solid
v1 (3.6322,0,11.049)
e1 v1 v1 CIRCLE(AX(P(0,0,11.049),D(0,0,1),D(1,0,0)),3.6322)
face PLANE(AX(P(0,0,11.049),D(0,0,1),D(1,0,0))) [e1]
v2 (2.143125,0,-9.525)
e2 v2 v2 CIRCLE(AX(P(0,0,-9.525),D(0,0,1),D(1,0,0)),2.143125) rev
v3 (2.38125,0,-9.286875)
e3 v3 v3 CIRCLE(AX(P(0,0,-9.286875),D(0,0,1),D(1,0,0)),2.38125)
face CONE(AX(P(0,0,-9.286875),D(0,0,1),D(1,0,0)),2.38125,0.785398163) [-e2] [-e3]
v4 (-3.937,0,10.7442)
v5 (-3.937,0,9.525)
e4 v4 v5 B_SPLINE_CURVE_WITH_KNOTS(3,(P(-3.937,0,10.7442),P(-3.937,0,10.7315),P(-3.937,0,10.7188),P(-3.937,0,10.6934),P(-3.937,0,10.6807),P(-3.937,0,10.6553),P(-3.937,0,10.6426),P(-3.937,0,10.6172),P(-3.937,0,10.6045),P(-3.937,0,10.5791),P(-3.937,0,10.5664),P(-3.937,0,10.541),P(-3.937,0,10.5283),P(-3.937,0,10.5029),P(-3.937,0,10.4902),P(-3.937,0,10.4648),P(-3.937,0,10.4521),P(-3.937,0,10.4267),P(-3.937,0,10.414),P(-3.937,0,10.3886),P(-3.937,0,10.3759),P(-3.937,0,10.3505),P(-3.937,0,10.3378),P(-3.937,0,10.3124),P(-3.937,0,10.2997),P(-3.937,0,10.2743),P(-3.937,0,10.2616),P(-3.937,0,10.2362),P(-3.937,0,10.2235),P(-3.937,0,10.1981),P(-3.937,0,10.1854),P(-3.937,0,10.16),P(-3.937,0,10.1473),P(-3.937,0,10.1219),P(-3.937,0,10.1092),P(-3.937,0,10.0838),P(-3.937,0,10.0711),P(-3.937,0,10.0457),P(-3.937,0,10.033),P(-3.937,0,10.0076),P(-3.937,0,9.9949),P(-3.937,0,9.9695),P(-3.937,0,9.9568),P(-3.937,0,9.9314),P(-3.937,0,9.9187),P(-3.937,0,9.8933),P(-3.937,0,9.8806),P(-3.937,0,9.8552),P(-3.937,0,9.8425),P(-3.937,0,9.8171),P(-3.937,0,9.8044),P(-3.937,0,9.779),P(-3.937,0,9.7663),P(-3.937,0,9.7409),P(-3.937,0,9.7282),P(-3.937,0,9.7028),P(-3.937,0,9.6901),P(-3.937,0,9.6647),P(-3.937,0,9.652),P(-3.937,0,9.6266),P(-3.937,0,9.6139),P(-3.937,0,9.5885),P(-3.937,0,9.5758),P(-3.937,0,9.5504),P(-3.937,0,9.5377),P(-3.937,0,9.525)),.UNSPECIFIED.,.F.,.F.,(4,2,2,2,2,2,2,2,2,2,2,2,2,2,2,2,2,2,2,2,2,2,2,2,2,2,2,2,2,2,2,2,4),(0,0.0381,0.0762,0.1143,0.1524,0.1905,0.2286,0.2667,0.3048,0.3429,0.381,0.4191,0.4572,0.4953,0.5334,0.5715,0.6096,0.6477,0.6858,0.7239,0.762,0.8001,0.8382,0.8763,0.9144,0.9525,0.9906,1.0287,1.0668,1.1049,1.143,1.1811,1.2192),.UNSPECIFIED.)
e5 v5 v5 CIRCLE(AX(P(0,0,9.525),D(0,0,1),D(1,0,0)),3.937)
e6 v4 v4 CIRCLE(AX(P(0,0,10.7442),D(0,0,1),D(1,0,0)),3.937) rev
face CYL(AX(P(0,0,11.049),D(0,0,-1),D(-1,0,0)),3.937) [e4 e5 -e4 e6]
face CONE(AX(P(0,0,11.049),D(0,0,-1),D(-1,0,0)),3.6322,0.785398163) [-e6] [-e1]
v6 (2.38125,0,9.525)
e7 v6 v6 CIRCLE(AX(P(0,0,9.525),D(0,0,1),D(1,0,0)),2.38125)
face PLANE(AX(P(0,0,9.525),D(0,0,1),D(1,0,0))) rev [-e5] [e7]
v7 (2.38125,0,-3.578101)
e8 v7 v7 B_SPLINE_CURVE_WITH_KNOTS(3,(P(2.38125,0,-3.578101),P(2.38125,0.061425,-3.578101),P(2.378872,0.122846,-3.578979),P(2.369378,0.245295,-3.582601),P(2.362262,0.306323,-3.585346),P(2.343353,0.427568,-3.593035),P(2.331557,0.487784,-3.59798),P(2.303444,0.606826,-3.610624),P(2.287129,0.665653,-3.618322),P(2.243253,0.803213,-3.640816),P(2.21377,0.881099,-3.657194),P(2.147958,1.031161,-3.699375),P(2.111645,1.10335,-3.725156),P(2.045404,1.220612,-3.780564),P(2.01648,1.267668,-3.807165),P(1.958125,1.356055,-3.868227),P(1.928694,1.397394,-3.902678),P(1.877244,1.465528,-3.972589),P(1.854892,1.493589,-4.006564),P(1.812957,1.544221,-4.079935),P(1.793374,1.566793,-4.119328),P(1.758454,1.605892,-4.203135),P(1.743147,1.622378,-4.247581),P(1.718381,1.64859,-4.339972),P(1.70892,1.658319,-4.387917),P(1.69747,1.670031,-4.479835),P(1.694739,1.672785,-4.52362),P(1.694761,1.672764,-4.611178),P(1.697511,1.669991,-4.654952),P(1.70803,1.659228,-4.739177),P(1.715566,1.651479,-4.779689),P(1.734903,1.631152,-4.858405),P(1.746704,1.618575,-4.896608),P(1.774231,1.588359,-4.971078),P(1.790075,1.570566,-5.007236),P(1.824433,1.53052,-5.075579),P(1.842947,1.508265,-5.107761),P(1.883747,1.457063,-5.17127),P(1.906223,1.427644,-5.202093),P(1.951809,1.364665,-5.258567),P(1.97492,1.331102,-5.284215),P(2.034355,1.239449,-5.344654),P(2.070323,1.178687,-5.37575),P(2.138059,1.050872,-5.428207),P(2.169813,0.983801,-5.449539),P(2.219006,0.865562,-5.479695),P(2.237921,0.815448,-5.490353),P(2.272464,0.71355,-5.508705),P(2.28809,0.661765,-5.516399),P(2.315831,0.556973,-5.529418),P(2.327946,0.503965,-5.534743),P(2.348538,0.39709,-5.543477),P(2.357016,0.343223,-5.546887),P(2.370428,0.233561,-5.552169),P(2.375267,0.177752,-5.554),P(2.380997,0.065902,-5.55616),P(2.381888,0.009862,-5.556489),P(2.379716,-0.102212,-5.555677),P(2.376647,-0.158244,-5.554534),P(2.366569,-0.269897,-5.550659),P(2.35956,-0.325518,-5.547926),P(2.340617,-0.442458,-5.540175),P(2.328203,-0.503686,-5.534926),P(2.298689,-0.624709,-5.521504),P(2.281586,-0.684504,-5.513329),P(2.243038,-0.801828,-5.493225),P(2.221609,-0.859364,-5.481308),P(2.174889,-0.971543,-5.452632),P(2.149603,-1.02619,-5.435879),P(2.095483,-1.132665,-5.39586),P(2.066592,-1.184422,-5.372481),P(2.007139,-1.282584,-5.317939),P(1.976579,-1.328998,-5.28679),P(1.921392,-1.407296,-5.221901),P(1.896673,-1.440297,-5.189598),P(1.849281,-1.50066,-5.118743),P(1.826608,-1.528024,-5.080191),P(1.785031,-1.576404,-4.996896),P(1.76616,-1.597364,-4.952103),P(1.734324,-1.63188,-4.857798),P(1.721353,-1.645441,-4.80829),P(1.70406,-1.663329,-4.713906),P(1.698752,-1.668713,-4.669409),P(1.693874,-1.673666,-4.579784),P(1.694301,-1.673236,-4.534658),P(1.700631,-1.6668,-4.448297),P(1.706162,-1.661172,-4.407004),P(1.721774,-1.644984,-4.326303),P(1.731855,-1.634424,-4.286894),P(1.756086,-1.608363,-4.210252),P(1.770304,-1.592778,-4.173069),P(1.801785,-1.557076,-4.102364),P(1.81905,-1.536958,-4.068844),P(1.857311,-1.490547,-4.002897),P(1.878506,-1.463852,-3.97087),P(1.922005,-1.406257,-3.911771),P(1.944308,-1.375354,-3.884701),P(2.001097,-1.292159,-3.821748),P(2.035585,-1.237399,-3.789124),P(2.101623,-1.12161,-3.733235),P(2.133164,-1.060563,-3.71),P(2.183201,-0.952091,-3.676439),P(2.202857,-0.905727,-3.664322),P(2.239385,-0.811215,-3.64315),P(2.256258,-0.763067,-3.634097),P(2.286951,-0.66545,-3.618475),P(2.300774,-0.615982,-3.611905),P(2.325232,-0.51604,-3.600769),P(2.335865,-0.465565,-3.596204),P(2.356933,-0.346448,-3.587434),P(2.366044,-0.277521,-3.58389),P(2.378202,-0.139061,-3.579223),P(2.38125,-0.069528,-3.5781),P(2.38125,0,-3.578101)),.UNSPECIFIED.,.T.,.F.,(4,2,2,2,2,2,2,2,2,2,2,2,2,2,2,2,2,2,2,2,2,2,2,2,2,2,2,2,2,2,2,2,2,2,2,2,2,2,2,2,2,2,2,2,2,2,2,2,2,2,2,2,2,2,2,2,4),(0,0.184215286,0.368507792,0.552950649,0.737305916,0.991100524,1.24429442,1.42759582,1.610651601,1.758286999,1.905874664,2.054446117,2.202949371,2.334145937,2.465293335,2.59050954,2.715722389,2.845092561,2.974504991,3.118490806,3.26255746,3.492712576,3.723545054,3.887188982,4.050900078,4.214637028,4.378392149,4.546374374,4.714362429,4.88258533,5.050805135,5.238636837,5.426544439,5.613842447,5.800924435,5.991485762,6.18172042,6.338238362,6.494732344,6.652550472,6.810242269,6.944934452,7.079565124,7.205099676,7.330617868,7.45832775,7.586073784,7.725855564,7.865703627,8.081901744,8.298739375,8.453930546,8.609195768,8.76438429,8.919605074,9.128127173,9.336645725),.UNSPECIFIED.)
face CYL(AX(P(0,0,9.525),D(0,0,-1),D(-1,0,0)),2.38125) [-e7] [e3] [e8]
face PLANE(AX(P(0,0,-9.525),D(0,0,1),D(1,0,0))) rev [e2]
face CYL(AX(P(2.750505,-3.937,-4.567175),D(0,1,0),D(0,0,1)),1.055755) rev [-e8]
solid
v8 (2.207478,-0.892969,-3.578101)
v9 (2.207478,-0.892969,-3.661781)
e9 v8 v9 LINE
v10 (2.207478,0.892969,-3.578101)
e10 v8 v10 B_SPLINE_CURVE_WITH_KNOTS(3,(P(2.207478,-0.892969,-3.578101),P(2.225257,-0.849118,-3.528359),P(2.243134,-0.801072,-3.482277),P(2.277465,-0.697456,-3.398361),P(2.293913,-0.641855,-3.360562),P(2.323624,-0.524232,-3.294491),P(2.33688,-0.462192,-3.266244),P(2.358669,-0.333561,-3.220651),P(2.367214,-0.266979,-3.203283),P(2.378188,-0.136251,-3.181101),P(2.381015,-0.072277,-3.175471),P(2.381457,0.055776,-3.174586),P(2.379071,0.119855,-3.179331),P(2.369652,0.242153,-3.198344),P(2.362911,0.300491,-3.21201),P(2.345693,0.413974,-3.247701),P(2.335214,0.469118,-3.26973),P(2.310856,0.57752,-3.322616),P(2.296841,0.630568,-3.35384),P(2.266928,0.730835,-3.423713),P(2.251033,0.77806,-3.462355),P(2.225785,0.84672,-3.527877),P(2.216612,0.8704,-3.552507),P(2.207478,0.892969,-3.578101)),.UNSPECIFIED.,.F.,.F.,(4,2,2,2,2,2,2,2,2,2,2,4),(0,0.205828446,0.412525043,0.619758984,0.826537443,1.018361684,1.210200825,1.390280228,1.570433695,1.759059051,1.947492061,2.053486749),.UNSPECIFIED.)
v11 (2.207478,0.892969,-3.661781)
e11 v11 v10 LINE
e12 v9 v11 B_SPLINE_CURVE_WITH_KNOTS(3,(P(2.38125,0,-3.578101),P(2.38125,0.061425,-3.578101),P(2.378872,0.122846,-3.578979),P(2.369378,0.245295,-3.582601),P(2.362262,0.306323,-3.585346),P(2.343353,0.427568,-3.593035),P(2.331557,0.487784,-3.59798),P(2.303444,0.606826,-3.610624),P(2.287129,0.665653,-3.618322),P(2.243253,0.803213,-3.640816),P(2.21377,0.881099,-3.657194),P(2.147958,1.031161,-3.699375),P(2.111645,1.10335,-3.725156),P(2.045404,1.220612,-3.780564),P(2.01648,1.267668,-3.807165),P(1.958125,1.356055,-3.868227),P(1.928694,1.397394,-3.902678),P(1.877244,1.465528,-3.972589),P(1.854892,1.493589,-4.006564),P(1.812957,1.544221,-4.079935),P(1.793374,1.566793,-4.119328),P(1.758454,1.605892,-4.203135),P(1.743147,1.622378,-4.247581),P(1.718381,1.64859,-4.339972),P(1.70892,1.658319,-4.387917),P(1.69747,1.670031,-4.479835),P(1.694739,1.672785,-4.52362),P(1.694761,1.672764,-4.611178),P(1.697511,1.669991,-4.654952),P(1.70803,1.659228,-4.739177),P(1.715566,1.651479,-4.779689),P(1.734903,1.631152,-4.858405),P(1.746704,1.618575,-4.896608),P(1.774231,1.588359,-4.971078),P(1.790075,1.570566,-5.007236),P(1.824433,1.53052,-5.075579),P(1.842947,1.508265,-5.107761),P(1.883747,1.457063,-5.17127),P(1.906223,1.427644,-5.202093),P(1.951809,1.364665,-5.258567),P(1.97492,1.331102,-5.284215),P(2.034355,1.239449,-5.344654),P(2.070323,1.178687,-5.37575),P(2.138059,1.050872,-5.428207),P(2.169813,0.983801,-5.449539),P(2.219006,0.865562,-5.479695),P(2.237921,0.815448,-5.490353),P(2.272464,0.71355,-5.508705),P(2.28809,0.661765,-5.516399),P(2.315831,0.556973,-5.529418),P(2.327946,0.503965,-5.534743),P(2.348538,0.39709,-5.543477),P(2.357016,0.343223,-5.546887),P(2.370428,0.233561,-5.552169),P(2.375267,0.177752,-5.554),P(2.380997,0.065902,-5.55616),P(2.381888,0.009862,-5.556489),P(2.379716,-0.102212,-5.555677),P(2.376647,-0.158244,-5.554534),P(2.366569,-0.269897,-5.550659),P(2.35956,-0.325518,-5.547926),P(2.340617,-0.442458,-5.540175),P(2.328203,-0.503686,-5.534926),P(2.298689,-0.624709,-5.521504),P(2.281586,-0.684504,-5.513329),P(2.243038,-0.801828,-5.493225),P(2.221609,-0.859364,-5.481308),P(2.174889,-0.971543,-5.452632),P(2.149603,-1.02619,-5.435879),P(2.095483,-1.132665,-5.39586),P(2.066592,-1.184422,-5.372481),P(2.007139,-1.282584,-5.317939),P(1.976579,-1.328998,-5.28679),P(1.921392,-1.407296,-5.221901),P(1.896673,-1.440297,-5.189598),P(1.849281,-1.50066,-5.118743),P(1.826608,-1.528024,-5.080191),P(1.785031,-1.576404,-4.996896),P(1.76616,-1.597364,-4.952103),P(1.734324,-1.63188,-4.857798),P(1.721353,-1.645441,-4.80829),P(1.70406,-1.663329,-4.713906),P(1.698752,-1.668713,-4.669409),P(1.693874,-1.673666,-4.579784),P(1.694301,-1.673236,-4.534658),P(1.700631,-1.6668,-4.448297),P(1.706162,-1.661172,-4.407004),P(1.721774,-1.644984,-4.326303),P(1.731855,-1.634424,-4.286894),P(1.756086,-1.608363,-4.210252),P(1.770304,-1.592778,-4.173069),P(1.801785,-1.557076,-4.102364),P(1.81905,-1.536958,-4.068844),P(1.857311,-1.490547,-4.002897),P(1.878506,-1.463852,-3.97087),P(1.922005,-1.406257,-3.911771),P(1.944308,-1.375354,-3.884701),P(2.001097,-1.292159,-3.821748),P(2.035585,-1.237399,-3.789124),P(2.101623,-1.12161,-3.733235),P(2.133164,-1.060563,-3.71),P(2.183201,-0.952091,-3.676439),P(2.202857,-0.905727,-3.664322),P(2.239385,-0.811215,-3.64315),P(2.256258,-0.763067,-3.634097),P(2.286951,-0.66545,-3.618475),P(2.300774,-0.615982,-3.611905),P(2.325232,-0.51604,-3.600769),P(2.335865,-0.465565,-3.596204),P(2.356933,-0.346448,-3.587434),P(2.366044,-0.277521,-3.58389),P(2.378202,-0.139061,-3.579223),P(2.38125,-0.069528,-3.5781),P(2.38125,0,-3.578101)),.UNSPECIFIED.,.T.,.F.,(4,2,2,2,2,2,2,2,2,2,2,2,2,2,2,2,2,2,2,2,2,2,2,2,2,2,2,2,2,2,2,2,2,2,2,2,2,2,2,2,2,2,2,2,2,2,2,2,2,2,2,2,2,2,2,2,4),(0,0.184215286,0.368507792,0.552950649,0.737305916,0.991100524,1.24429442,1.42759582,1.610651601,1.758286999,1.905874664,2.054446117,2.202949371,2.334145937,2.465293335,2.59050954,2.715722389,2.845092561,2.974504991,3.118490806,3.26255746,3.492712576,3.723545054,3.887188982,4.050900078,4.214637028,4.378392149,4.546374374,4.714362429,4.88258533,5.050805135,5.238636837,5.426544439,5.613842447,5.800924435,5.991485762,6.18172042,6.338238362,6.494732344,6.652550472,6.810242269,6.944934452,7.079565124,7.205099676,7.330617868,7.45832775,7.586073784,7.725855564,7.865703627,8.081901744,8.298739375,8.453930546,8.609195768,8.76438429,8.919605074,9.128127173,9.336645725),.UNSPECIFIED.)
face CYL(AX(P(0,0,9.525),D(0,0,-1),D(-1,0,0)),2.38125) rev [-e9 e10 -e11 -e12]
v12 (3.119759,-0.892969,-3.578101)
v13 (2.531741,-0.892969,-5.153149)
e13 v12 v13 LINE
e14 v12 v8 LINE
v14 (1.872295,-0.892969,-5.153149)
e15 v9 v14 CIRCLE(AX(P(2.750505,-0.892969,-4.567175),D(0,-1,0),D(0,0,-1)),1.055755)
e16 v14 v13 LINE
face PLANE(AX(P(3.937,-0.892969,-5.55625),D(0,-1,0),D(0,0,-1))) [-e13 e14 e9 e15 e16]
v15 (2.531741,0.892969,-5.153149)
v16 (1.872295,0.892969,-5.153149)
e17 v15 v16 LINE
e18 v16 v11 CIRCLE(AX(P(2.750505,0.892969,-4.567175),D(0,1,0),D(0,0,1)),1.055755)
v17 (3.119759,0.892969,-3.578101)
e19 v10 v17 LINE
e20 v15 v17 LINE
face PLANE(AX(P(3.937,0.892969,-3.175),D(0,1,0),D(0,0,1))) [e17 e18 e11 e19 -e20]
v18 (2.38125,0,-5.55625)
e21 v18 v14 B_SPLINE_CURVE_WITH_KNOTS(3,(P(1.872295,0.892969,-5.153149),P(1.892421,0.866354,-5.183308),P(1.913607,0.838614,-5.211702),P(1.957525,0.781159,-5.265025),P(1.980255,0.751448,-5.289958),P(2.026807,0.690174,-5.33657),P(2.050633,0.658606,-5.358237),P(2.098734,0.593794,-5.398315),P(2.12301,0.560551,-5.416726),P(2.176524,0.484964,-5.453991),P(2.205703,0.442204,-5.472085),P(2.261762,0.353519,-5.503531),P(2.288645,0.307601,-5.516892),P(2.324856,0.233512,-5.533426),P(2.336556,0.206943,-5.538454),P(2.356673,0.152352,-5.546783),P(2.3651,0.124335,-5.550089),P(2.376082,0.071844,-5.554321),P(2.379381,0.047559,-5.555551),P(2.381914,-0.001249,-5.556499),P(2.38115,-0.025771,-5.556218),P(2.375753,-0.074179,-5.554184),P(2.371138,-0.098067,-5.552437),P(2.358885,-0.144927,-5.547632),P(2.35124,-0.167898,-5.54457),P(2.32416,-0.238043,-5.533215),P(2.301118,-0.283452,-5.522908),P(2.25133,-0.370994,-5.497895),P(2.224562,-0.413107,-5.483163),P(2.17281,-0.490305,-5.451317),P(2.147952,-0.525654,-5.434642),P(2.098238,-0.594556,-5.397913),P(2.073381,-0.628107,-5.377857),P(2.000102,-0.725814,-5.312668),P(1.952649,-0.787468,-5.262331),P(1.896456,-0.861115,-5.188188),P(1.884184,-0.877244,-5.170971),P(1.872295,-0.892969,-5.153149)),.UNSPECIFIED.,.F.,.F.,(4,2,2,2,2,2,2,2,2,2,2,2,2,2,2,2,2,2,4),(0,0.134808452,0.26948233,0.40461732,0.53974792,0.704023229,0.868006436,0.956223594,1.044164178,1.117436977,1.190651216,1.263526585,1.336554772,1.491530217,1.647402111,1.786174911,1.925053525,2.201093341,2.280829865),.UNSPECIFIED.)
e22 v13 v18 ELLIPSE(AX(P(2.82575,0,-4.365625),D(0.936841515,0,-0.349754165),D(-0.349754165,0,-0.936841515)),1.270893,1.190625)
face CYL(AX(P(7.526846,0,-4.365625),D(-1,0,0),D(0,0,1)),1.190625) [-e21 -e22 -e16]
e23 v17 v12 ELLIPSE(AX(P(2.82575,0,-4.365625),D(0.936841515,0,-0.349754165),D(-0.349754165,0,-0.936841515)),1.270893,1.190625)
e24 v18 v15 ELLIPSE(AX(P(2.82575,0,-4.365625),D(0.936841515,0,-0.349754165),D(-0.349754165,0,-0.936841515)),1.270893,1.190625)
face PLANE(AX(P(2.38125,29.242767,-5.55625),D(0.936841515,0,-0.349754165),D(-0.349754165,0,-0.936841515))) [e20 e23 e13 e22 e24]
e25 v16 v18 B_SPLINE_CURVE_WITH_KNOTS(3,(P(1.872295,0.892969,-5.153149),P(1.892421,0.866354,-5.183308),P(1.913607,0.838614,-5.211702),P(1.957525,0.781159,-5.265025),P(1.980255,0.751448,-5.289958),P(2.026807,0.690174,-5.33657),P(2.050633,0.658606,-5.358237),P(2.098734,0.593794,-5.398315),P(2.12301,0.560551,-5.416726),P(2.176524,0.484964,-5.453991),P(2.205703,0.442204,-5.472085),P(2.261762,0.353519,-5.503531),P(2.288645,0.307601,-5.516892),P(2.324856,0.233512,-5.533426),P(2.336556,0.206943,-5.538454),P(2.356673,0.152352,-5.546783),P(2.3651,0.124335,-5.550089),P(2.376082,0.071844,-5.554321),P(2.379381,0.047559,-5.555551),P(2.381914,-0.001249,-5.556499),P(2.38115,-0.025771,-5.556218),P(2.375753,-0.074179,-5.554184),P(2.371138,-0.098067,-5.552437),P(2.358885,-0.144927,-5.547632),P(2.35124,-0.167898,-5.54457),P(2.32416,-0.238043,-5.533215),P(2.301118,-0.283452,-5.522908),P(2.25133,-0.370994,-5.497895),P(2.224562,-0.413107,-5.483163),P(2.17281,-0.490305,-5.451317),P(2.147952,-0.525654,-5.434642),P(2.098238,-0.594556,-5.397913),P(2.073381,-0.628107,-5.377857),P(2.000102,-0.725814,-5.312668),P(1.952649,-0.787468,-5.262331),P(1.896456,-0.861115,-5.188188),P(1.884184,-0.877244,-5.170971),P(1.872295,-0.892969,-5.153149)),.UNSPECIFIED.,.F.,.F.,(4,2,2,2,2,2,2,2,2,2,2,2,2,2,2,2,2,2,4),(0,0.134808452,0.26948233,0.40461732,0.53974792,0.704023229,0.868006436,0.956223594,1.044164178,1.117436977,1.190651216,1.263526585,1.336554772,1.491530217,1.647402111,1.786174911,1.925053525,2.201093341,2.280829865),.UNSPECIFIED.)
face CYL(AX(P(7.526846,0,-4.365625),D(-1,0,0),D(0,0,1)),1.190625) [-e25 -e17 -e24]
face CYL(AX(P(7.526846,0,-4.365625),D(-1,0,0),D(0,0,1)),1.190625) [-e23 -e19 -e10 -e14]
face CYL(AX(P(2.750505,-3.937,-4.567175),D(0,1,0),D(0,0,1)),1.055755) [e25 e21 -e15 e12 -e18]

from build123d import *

# Parameters (mm, degrees)
SKETCH1_R               = 2.38125
EXTRUDE1_DEPTH          = 9.525
SKETCH2_R               = 3.937
EXTRUDE2_DEPTH          = 1.524
CHAMFER1_SIZE           = 0.3048
CHAMFER2_SIZE           = 0.238125
SKETCH3_R               = 1.190625
EXTRUDE5_DEPTH          = 3.27025
EXTRUDE6_DEPTH          = 13.372563962
EXTRUDE6_DEPTH_BACK     = 13.372563962
SKETCH11_W              = 2.38125
SKETCH11_H              = 1.48828125
EXTRUDE8_DEPTH          = 13.372563962
EXTRUDE7_DEPTH          = 13.372563962
EXTRUDE7_DEPTH_BACK     = 13.372563962
BODY_MOVE_COPY1_START   = -3
BODY_MOVE_COPY1_2_DEPTH = 6


with BuildPart() as part:
    # Sketch1 → Extrude1 (new, symmetric)
    with BuildSketch(Plane.XY):
        with Locations(Location((0, 0, 0), (0, 0, 180))):
            Circle(SKETCH1_R)
    extrude(amount=EXTRUDE1_DEPTH, both=True)

    # Sketch2 → Extrude2 (add)
    with BuildSketch(Plane.XY.offset(9.525)):
        with Locations(Location((0, 0, 0), (0, 0, 180))):
            Circle(SKETCH2_R)
    extrude(amount=EXTRUDE2_DEPTH)

    # Chamfer1
    chamfer1_edges = [part.edges().sort_by_distance(p)[0] for p in [
        (3.937, 0, 11.049),
    ]]
    chamfer(chamfer1_edges, length=CHAMFER1_SIZE)

    # Chamfer2
    chamfer2_edges = [part.edges().sort_by_distance(p)[0] for p in [
        (2.38125, 0, -9.525),
    ]]
    chamfer(chamfer2_edges, length=CHAMFER2_SIZE)

    # Sketch10 → Extrude7 (cut, two sides: drawn at the far end of the back side and taken through both)
    with BuildSketch(Plane(origin=(0, 0, 0), x_dir=(1, 0, 0), z_dir=(0, 1, 0)).offset(-EXTRUDE7_DEPTH_BACK)):
        with BuildLine():
            Line((2.38125, 5.55625), (2.38125, 3.578100586))
            ThreePointArc((2.38125, 3.578100586), (1.694749991, 4.567175293), (2.38125, 5.55625))
        make_face()
    extrude(amount=EXTRUDE7_DEPTH + EXTRUDE7_DEPTH_BACK, mode=Mode.SUBTRACT)


with BuildPart() as body_2:
    # Sketch3 → Extrude5 (new body)
    with BuildSketch(Plane(origin=(0, 0, 0), x_dir=(0, 0, -1), z_dir=(1, 0, 0))):
        with Locations(Location((4.365625, 0, 0), (0, 0, 180))):
            Circle(SKETCH3_R)
    extrude(amount=EXTRUDE5_DEPTH)

    # Sketch9 → Extrude6 (cut, two sides: drawn at the far end of the back side and taken through both)
    with BuildSketch(Plane(origin=(0, 0, 0), x_dir=(1, 0, 0), z_dir=(0, 1, 0)).offset(-EXTRUDE6_DEPTH_BACK)):
        Polygon((-13.544226274, 48.213775733), (2.38125, 5.55625), (3.27025, 3.175), (19.195726274, -39.482525733), (104.51077774, -7.631573186), (71.770825193, 80.064728281), align=None)
    extrude(amount=EXTRUDE6_DEPTH + EXTRUDE6_DEPTH_BACK, mode=Mode.SUBTRACT)

    # Sketch11 → Extrude8 (cut, through all)
    with BuildSketch(Plane(origin=(0, 0, 0), x_dir=(0, 0, -1), z_dir=(1, 0, 0))):
        with Locations((4.365625, 1.637109375)):
            Rectangle(SKETCH11_W, SKETCH11_H)
        with Locations((4.365625, -1.637109375)):
            Rectangle(SKETCH11_W, SKETCH11_H)
    extrude(amount=EXTRUDE8_DEPTH, mode=Mode.SUBTRACT)


with BuildPart() as body_3:
    # Body-Move/Copy1: read off the stored shape, not the designer's step
    # Body-Move/Copy1 outline → Body-Move/Copy1 (revolve)
    with BuildSketch(Plane.XZ):
        Polygon((0, 11.049), (0, -9.525), (2.143125, -9.525), (2.38125, -9.286875), (2.38125, 9.525), (3.937, 9.525), (3.937, 10.7442), (3.6322, 11.049), align=None)
    revolve(axis=Axis((0, 0, 0), (0, 0, 1)))

    # Body-Move_Copy1 2 outline → Body-Move_Copy1 2 (cut)
    with BuildSketch(Plane(origin=(0, 0, 0), x_dir=(1, 0, 0), z_dir=(0, 1, 0)).offset(BODY_MOVE_COPY1_START)):
        with BuildLine():
            Line((4, 6.160583018), (2.381250169, 5.556250063))
            ThreePointArc((2.381250169, 5.556250063), (1.694749991, 4.567175372), (2.381250021, 3.578100578))
            Line((2.381250021, 3.578100578), (4, 2.973767292))
            Line((4, 2.973767292), (4, 6.160583018))
        make_face()
    extrude(amount=BODY_MOVE_COPY1_2_DEPTH, mode=Mode.SUBTRACT)


with BuildPart() as body_2_1:
    add(body_2.part)

    # Combine1: cut body 3
    add(body_3.part, mode=Mode.SUBTRACT)


solid = Compound([part.part, body_2_1.part])
